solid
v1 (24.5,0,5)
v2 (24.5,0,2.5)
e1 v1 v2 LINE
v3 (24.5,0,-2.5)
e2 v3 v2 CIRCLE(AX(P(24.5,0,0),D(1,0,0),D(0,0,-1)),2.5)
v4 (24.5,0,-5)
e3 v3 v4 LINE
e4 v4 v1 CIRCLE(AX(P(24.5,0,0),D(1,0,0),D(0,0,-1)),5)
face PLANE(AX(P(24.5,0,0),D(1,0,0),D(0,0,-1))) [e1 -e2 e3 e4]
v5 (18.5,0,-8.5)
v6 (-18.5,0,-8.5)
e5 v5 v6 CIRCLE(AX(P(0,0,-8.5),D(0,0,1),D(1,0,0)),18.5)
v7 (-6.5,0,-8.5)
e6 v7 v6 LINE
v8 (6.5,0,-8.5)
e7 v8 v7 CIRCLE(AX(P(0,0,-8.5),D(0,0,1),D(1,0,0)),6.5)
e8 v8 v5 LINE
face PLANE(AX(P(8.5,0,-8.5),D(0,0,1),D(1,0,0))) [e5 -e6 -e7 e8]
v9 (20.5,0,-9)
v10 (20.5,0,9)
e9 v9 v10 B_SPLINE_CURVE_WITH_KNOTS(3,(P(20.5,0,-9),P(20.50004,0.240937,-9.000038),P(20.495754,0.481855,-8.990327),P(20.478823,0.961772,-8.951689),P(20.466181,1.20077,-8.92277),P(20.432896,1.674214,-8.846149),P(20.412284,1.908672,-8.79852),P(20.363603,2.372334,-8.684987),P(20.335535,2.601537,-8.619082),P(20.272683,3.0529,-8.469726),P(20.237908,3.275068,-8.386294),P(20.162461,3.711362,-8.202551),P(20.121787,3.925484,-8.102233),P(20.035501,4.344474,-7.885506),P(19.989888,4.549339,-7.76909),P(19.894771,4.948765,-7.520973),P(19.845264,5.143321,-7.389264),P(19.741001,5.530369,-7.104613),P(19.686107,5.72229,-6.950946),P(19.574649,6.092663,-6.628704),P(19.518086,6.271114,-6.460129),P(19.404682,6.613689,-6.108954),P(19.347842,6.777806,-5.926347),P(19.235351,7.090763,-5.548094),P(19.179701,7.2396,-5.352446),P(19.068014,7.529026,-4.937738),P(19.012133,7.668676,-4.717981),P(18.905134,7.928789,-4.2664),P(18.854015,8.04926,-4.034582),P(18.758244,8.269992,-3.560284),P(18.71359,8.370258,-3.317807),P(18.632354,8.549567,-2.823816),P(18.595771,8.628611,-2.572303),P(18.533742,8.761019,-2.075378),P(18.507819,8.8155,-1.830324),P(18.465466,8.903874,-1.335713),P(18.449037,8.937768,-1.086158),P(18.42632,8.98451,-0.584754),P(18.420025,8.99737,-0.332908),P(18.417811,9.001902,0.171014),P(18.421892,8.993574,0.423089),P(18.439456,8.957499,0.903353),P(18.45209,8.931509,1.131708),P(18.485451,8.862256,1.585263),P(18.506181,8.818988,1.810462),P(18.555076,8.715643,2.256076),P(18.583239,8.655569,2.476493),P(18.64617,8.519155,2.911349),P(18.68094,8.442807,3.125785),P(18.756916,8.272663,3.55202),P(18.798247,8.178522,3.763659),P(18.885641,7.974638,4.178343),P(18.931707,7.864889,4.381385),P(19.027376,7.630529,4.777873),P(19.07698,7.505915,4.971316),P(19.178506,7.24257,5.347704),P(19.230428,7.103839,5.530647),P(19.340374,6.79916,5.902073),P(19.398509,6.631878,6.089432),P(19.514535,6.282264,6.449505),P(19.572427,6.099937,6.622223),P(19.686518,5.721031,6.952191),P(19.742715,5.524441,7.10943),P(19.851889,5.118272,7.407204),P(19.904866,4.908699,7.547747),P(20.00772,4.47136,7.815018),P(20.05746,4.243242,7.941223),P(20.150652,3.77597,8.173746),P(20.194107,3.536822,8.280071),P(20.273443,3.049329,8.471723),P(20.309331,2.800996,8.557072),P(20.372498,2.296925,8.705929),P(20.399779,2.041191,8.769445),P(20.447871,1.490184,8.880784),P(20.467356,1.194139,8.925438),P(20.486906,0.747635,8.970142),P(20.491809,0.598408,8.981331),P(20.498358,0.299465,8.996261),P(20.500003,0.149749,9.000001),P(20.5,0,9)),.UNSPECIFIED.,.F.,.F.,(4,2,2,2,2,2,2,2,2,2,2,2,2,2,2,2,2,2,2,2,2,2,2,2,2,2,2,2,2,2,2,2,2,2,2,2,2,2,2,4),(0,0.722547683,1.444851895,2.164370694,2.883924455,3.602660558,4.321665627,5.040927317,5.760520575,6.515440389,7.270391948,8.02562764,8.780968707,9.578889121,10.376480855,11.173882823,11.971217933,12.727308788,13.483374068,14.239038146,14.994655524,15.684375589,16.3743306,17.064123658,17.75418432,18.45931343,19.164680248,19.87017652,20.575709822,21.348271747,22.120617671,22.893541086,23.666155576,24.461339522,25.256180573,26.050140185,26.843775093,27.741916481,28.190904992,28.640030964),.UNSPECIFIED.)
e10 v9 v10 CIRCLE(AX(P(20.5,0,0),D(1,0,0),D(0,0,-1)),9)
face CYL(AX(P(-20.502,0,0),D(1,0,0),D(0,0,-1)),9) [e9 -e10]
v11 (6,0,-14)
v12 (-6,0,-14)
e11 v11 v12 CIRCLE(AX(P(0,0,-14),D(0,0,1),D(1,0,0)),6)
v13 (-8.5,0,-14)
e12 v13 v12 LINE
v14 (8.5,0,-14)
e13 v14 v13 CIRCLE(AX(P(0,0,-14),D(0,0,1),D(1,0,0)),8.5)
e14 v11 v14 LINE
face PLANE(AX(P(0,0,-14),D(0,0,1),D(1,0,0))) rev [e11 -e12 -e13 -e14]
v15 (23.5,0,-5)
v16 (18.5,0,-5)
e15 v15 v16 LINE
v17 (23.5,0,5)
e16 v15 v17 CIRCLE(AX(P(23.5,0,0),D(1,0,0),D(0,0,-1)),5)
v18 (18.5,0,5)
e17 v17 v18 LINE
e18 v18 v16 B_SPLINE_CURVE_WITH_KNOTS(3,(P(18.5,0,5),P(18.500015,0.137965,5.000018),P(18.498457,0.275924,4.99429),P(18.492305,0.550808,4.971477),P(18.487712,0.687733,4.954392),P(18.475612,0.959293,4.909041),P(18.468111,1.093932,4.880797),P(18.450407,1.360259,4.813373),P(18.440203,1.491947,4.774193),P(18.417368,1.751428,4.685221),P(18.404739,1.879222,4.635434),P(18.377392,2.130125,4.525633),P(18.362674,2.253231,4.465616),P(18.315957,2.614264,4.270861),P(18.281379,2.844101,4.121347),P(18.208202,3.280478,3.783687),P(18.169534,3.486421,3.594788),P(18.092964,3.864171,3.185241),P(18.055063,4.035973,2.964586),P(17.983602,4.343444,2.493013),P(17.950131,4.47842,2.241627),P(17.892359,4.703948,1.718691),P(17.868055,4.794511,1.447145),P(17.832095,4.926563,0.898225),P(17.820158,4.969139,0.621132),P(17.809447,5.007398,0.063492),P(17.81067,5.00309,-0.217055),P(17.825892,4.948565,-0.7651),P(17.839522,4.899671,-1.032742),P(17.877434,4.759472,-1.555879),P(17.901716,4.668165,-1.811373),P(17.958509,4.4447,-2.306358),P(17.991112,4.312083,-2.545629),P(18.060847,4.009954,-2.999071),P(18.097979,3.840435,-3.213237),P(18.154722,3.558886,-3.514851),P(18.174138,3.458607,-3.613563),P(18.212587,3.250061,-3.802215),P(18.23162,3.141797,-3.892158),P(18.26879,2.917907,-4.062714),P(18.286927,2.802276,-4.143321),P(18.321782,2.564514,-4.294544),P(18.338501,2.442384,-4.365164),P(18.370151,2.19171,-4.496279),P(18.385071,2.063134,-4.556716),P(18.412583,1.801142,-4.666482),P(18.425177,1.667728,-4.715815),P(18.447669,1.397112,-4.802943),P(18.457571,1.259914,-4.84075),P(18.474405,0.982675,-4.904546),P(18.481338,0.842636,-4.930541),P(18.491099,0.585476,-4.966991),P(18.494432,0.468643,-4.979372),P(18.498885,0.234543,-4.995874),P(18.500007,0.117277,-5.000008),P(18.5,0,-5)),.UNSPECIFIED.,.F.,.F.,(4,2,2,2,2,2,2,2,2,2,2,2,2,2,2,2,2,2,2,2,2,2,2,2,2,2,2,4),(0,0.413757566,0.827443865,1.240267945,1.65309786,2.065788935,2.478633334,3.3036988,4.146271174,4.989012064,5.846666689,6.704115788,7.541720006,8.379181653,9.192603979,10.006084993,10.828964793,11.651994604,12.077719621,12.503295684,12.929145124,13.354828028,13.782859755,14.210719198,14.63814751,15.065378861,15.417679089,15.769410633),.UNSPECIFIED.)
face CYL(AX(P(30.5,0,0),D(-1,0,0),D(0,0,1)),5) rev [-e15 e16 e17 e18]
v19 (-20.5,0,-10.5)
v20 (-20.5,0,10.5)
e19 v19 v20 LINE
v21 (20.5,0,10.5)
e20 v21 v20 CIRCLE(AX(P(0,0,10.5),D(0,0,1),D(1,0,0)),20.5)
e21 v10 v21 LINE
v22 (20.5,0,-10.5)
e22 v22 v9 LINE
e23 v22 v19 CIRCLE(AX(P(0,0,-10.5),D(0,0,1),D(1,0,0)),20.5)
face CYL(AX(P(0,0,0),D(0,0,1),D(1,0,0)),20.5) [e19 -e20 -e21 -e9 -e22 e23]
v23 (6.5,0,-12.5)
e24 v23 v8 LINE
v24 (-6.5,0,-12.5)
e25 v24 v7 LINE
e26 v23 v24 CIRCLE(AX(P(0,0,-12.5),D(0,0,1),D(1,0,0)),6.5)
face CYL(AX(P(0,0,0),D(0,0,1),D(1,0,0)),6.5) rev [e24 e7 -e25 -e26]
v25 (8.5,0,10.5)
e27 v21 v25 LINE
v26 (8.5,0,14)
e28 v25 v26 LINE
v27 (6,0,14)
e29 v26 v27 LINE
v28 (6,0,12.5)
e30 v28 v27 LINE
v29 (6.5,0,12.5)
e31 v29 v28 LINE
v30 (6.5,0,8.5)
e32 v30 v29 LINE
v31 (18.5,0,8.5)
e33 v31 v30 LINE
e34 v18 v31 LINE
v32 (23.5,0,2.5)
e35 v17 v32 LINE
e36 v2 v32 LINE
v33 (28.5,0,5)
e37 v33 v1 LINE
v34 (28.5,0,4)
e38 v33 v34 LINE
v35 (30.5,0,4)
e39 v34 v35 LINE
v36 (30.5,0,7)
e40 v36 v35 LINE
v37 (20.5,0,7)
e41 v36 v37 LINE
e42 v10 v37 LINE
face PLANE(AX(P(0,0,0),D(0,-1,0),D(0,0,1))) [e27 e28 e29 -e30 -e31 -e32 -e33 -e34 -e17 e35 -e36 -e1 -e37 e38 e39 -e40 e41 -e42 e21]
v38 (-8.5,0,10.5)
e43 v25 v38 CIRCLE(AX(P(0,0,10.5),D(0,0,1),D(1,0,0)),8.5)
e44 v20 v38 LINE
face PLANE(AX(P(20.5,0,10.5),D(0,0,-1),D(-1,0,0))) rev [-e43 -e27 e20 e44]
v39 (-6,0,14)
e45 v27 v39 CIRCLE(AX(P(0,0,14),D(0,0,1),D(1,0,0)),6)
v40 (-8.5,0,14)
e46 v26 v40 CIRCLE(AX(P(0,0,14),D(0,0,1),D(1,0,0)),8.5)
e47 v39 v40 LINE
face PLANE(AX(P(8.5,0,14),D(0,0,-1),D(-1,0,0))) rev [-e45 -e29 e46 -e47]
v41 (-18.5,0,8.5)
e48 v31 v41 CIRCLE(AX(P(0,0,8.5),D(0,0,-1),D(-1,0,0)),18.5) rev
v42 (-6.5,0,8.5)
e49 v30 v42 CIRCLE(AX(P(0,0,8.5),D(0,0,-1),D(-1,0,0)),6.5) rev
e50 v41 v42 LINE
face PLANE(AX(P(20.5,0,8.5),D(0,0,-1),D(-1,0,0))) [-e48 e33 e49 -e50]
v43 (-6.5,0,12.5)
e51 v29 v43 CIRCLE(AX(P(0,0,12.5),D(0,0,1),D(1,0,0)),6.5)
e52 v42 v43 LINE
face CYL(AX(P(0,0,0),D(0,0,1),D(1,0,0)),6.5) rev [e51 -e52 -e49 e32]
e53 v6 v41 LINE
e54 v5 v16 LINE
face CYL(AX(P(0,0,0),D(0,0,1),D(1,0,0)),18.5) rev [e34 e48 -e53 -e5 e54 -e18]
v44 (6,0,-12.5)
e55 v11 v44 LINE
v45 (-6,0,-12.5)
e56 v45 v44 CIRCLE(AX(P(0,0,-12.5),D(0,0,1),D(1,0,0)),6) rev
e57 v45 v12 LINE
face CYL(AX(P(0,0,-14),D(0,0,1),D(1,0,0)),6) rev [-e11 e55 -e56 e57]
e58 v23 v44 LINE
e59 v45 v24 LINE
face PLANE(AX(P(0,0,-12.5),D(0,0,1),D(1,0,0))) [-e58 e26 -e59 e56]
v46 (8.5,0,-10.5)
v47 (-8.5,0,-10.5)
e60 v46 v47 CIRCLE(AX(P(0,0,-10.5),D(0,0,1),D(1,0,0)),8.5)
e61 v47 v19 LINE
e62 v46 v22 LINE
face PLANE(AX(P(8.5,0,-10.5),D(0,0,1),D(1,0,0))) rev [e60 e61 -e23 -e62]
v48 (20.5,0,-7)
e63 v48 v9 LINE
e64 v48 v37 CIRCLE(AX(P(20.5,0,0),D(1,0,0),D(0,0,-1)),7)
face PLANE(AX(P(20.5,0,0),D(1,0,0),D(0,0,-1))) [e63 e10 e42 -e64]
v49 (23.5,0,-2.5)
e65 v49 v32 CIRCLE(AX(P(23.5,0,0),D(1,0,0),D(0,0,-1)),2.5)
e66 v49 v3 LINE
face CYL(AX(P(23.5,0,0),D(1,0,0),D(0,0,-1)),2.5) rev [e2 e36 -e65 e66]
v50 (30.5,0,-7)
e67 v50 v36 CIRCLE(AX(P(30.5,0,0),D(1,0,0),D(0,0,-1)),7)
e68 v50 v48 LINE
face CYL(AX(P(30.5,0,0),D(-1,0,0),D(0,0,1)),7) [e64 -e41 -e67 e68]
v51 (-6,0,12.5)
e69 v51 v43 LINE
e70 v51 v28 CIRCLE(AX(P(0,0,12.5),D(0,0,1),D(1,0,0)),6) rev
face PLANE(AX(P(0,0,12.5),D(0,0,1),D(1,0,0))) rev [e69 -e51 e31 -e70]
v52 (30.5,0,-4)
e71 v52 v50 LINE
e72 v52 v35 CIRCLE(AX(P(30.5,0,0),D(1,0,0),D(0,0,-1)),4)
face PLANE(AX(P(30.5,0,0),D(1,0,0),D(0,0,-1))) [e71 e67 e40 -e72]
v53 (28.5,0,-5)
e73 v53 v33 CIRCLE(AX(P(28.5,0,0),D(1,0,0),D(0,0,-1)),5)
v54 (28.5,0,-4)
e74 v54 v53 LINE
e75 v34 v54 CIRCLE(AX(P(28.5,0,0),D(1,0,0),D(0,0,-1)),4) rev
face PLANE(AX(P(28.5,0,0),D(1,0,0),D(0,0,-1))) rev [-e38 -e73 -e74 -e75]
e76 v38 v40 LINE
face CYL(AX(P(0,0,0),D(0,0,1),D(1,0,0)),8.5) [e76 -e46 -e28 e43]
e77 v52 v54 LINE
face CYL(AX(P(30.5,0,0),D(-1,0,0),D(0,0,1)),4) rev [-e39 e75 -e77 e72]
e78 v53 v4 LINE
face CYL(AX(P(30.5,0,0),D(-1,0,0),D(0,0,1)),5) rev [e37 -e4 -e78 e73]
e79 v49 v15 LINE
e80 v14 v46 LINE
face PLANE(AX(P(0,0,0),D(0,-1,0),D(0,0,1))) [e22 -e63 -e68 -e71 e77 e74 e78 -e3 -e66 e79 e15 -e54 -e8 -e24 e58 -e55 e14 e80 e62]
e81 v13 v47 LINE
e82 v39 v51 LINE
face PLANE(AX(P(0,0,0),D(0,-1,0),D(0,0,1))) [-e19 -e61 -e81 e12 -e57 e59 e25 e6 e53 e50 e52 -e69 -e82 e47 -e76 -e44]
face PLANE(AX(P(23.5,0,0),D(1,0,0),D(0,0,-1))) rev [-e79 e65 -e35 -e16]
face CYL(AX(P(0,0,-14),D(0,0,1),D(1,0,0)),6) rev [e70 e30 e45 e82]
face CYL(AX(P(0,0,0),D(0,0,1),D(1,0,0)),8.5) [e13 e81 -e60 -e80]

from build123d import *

# Parameters (mm, degrees)
REVOLVE1_ANGLE          = 180
SHELL1_START            = -8.5
SHELL1_DEPTH            = 17
SHELL1_START_2          = -12
SHELL1_2_DEPTH          = 24
CUT_EXTRUDE1_DEPTH      = 33.194720064
CUT_EXTRUDE1_DEPTH_BACK = 33.194720064
SKETCH3_R               = 6
BOSS_EXTRUDE1_REACH     = 49.93
SKETCH6_R               = 9
BOSS_EXTRUDE3_DEPTH     = 10
SHELL2_START            = 19.880907618
SHELL2_DEPTH            = 8.619092382
SHELL2_START_2          = -5.0000001
SHELL2_2_DEPTH          = 10.0000001
CUT_EXTRUDE2_REACH      = 41.326
SKETCH8_R               = 5
SKETCH9_R               = 4
CUT_EXTRUDE3_DEPTH      = 10
BOSS_EXTRUDE4_START     = -1
BOSS_EXTRUDE4_DEPTH     = 1
SKETCH11_R              = 2.5
CUT_EXTRUDE4_DEPTH      = 1
CUT_EXTRUDE6_DEPTH      = 12.5
CUT_EXTRUDE6_DEPTH_BACK = 12.5
SKETCH12_R              = 6.5


with BuildPart() as part:
    # Sketch2 → Revolve1 (revolve)
    with BuildSketch(Plane(origin=(0, 0, 0), x_dir=(1, 0, 0), z_dir=(0, 1, 0))):
        Polygon((0, 0), (0, 14), (-8.5, 14), (-8.5, 10.5), (-20.5, 10.5), (-20.5, 0), (-20.5, -10.5), (-8.5, -10.5), (-8.5, -14), (0, -14), align=None)
    revolve(axis=Axis((0, 0, 0), (0, 0, -1)), revolution_arc=REVOLVE1_ANGLE)

    # Shell1: read off the stored shape, not the designer's step
    # Shell1 outline → Shell1 (cut)
    with BuildSketch(Plane.XY.offset(SHELL1_START)):
        with BuildLine():
            ThreePointArc((18.5, 0), (0, 18.5), (-18.5, 0))
            Line((-18.5, 0), (18.5, 0))
        make_face()
    extrude(amount=SHELL1_DEPTH, mode=Mode.SUBTRACT)

    # Shell1 2 outline → Shell1 2 (cut)
    with BuildSketch(Plane.XY.offset(SHELL1_START_2)):
        with BuildLine():
            Line((-6.5, 0), (6.5, 0))
            ThreePointArc((6.5, 0), (0, 6.5), (-6.5, 0))
        make_face()
    extrude(amount=SHELL1_2_DEPTH, mode=Mode.SUBTRACT)

    # Sketch3 → Cut-Extrude1 (cut, two sides: drawn at the far end of the back side and taken through both)
    with BuildSketch(Plane.XY.offset(-CUT_EXTRUDE1_DEPTH_BACK)):
        Circle(SKETCH3_R)
    extrude(amount=CUT_EXTRUDE1_DEPTH + CUT_EXTRUDE1_DEPTH_BACK, mode=Mode.SUBTRACT)

    # Sketch6 → Boss-Extrude1 (add, up to next)
    with BuildSketch(Plane(origin=(20.5, 0, 0), x_dir=(0, 0, -1), z_dir=(1, 0, 0)), mode=Mode.PRIVATE) as boss_extrude1_sk1:
        Circle(SKETCH6_R)
    boss_extrude1_tool1 = extrude(boss_extrude1_sk1.sketch, amount=-BOSS_EXTRUDE1_REACH, mode=Mode.PRIVATE) - part.part
    add(boss_extrude1_tool1.solids().sort_by_distance((20.5, 0, 0))[0])

    # Sketch7 → Boss-Extrude3 (add)
    with BuildSketch(Plane(origin=(20.5, 0, 0), x_dir=(0, 0, -1), z_dir=(1, 0, 0))):
        with BuildLine():
            Line((-7, 0), (7, 0))
            ThreePointArc((7, 0), (0, 7), (-7, 0))
        make_face()
    extrude(amount=BOSS_EXTRUDE3_DEPTH)

    # Shell2: read off the stored shape, not the designer's step
    # Shell2 outline → Shell2 (cut)
    with BuildSketch(Plane.YZ.offset(SHELL2_START)):
        with BuildLine():
            ThreePointArc((0, -5), (5, 0), (0, 5))
            Line((0, 5), (0, -5))
        make_face()
    extrude(amount=SHELL2_DEPTH, mode=Mode.SUBTRACT)

    # Shell2 2 outline → Shell2 2 (add)
    with BuildSketch(Plane.XY.offset(SHELL2_START_2)):
        with BuildLine():
            Line((19.880896081, 4.999997099), (19.880907618, 0))
            Line((19.880907618, 0), (20.5, 0))
            ThreePointArc((20.5, 0), (20.344635284, 2.519090146), (19.880896081, 4.999997099))
        make_face()
    extrude(amount=SHELL2_2_DEPTH)

    # Sketch8 → Cut-Extrude2 (cut, up to next)
    with BuildSketch(Plane(origin=(0, 0, 0), x_dir=(0, 0, -1), z_dir=(1, 0, 0)), mode=Mode.PRIVATE) as cut_extrude2_sk1:
        Circle(SKETCH8_R)
    cut_extrude2_tool1 = extrude(cut_extrude2_sk1.sketch, amount=CUT_EXTRUDE2_REACH, mode=Mode.PRIVATE) & part.part
    add(cut_extrude2_tool1.solids().sort_by_distance((0, 0, 0))[0], mode=Mode.SUBTRACT)

    # Sketch9 → Cut-Extrude3 (cut)
    with BuildSketch(Plane(origin=(20.5, 0, 0), x_dir=(0, 0, -1), z_dir=(1, 0, 0))):
        Circle(SKETCH9_R)
    extrude(amount=CUT_EXTRUDE3_DEPTH, mode=Mode.SUBTRACT)

    # Sketch10 → Boss-Extrude4 (add)
    with BuildSketch(Plane(origin=(24.5, 0, 0), x_dir=(0, 0, -1), z_dir=(1, 0, 0)).offset(BOSS_EXTRUDE4_START)):
        with BuildLine():
            Line((-5, 0), (5, 0))
            ThreePointArc((5, 0), (0, 5), (-5, 0))
        make_face()
    extrude(amount=BOSS_EXTRUDE4_DEPTH)

    # Sketch11 → Cut-Extrude4 (cut)
    with BuildSketch(Plane(origin=(24.5, 0, 0), x_dir=(0, 0, -1), z_dir=(1, 0, 0))):
        Circle(SKETCH11_R)
    extrude(amount=-CUT_EXTRUDE4_DEPTH, mode=Mode.SUBTRACT)

    # Sketch12 → Cut-Extrude6 (cut, two sides: drawn at the far end of the back side and taken through both)
    with BuildSketch(Plane.XY.offset(-CUT_EXTRUDE6_DEPTH_BACK)):
        Circle(SKETCH12_R)
    extrude(amount=CUT_EXTRUDE6_DEPTH + CUT_EXTRUDE6_DEPTH_BACK, mode=Mode.SUBTRACT)


solid = part.part
